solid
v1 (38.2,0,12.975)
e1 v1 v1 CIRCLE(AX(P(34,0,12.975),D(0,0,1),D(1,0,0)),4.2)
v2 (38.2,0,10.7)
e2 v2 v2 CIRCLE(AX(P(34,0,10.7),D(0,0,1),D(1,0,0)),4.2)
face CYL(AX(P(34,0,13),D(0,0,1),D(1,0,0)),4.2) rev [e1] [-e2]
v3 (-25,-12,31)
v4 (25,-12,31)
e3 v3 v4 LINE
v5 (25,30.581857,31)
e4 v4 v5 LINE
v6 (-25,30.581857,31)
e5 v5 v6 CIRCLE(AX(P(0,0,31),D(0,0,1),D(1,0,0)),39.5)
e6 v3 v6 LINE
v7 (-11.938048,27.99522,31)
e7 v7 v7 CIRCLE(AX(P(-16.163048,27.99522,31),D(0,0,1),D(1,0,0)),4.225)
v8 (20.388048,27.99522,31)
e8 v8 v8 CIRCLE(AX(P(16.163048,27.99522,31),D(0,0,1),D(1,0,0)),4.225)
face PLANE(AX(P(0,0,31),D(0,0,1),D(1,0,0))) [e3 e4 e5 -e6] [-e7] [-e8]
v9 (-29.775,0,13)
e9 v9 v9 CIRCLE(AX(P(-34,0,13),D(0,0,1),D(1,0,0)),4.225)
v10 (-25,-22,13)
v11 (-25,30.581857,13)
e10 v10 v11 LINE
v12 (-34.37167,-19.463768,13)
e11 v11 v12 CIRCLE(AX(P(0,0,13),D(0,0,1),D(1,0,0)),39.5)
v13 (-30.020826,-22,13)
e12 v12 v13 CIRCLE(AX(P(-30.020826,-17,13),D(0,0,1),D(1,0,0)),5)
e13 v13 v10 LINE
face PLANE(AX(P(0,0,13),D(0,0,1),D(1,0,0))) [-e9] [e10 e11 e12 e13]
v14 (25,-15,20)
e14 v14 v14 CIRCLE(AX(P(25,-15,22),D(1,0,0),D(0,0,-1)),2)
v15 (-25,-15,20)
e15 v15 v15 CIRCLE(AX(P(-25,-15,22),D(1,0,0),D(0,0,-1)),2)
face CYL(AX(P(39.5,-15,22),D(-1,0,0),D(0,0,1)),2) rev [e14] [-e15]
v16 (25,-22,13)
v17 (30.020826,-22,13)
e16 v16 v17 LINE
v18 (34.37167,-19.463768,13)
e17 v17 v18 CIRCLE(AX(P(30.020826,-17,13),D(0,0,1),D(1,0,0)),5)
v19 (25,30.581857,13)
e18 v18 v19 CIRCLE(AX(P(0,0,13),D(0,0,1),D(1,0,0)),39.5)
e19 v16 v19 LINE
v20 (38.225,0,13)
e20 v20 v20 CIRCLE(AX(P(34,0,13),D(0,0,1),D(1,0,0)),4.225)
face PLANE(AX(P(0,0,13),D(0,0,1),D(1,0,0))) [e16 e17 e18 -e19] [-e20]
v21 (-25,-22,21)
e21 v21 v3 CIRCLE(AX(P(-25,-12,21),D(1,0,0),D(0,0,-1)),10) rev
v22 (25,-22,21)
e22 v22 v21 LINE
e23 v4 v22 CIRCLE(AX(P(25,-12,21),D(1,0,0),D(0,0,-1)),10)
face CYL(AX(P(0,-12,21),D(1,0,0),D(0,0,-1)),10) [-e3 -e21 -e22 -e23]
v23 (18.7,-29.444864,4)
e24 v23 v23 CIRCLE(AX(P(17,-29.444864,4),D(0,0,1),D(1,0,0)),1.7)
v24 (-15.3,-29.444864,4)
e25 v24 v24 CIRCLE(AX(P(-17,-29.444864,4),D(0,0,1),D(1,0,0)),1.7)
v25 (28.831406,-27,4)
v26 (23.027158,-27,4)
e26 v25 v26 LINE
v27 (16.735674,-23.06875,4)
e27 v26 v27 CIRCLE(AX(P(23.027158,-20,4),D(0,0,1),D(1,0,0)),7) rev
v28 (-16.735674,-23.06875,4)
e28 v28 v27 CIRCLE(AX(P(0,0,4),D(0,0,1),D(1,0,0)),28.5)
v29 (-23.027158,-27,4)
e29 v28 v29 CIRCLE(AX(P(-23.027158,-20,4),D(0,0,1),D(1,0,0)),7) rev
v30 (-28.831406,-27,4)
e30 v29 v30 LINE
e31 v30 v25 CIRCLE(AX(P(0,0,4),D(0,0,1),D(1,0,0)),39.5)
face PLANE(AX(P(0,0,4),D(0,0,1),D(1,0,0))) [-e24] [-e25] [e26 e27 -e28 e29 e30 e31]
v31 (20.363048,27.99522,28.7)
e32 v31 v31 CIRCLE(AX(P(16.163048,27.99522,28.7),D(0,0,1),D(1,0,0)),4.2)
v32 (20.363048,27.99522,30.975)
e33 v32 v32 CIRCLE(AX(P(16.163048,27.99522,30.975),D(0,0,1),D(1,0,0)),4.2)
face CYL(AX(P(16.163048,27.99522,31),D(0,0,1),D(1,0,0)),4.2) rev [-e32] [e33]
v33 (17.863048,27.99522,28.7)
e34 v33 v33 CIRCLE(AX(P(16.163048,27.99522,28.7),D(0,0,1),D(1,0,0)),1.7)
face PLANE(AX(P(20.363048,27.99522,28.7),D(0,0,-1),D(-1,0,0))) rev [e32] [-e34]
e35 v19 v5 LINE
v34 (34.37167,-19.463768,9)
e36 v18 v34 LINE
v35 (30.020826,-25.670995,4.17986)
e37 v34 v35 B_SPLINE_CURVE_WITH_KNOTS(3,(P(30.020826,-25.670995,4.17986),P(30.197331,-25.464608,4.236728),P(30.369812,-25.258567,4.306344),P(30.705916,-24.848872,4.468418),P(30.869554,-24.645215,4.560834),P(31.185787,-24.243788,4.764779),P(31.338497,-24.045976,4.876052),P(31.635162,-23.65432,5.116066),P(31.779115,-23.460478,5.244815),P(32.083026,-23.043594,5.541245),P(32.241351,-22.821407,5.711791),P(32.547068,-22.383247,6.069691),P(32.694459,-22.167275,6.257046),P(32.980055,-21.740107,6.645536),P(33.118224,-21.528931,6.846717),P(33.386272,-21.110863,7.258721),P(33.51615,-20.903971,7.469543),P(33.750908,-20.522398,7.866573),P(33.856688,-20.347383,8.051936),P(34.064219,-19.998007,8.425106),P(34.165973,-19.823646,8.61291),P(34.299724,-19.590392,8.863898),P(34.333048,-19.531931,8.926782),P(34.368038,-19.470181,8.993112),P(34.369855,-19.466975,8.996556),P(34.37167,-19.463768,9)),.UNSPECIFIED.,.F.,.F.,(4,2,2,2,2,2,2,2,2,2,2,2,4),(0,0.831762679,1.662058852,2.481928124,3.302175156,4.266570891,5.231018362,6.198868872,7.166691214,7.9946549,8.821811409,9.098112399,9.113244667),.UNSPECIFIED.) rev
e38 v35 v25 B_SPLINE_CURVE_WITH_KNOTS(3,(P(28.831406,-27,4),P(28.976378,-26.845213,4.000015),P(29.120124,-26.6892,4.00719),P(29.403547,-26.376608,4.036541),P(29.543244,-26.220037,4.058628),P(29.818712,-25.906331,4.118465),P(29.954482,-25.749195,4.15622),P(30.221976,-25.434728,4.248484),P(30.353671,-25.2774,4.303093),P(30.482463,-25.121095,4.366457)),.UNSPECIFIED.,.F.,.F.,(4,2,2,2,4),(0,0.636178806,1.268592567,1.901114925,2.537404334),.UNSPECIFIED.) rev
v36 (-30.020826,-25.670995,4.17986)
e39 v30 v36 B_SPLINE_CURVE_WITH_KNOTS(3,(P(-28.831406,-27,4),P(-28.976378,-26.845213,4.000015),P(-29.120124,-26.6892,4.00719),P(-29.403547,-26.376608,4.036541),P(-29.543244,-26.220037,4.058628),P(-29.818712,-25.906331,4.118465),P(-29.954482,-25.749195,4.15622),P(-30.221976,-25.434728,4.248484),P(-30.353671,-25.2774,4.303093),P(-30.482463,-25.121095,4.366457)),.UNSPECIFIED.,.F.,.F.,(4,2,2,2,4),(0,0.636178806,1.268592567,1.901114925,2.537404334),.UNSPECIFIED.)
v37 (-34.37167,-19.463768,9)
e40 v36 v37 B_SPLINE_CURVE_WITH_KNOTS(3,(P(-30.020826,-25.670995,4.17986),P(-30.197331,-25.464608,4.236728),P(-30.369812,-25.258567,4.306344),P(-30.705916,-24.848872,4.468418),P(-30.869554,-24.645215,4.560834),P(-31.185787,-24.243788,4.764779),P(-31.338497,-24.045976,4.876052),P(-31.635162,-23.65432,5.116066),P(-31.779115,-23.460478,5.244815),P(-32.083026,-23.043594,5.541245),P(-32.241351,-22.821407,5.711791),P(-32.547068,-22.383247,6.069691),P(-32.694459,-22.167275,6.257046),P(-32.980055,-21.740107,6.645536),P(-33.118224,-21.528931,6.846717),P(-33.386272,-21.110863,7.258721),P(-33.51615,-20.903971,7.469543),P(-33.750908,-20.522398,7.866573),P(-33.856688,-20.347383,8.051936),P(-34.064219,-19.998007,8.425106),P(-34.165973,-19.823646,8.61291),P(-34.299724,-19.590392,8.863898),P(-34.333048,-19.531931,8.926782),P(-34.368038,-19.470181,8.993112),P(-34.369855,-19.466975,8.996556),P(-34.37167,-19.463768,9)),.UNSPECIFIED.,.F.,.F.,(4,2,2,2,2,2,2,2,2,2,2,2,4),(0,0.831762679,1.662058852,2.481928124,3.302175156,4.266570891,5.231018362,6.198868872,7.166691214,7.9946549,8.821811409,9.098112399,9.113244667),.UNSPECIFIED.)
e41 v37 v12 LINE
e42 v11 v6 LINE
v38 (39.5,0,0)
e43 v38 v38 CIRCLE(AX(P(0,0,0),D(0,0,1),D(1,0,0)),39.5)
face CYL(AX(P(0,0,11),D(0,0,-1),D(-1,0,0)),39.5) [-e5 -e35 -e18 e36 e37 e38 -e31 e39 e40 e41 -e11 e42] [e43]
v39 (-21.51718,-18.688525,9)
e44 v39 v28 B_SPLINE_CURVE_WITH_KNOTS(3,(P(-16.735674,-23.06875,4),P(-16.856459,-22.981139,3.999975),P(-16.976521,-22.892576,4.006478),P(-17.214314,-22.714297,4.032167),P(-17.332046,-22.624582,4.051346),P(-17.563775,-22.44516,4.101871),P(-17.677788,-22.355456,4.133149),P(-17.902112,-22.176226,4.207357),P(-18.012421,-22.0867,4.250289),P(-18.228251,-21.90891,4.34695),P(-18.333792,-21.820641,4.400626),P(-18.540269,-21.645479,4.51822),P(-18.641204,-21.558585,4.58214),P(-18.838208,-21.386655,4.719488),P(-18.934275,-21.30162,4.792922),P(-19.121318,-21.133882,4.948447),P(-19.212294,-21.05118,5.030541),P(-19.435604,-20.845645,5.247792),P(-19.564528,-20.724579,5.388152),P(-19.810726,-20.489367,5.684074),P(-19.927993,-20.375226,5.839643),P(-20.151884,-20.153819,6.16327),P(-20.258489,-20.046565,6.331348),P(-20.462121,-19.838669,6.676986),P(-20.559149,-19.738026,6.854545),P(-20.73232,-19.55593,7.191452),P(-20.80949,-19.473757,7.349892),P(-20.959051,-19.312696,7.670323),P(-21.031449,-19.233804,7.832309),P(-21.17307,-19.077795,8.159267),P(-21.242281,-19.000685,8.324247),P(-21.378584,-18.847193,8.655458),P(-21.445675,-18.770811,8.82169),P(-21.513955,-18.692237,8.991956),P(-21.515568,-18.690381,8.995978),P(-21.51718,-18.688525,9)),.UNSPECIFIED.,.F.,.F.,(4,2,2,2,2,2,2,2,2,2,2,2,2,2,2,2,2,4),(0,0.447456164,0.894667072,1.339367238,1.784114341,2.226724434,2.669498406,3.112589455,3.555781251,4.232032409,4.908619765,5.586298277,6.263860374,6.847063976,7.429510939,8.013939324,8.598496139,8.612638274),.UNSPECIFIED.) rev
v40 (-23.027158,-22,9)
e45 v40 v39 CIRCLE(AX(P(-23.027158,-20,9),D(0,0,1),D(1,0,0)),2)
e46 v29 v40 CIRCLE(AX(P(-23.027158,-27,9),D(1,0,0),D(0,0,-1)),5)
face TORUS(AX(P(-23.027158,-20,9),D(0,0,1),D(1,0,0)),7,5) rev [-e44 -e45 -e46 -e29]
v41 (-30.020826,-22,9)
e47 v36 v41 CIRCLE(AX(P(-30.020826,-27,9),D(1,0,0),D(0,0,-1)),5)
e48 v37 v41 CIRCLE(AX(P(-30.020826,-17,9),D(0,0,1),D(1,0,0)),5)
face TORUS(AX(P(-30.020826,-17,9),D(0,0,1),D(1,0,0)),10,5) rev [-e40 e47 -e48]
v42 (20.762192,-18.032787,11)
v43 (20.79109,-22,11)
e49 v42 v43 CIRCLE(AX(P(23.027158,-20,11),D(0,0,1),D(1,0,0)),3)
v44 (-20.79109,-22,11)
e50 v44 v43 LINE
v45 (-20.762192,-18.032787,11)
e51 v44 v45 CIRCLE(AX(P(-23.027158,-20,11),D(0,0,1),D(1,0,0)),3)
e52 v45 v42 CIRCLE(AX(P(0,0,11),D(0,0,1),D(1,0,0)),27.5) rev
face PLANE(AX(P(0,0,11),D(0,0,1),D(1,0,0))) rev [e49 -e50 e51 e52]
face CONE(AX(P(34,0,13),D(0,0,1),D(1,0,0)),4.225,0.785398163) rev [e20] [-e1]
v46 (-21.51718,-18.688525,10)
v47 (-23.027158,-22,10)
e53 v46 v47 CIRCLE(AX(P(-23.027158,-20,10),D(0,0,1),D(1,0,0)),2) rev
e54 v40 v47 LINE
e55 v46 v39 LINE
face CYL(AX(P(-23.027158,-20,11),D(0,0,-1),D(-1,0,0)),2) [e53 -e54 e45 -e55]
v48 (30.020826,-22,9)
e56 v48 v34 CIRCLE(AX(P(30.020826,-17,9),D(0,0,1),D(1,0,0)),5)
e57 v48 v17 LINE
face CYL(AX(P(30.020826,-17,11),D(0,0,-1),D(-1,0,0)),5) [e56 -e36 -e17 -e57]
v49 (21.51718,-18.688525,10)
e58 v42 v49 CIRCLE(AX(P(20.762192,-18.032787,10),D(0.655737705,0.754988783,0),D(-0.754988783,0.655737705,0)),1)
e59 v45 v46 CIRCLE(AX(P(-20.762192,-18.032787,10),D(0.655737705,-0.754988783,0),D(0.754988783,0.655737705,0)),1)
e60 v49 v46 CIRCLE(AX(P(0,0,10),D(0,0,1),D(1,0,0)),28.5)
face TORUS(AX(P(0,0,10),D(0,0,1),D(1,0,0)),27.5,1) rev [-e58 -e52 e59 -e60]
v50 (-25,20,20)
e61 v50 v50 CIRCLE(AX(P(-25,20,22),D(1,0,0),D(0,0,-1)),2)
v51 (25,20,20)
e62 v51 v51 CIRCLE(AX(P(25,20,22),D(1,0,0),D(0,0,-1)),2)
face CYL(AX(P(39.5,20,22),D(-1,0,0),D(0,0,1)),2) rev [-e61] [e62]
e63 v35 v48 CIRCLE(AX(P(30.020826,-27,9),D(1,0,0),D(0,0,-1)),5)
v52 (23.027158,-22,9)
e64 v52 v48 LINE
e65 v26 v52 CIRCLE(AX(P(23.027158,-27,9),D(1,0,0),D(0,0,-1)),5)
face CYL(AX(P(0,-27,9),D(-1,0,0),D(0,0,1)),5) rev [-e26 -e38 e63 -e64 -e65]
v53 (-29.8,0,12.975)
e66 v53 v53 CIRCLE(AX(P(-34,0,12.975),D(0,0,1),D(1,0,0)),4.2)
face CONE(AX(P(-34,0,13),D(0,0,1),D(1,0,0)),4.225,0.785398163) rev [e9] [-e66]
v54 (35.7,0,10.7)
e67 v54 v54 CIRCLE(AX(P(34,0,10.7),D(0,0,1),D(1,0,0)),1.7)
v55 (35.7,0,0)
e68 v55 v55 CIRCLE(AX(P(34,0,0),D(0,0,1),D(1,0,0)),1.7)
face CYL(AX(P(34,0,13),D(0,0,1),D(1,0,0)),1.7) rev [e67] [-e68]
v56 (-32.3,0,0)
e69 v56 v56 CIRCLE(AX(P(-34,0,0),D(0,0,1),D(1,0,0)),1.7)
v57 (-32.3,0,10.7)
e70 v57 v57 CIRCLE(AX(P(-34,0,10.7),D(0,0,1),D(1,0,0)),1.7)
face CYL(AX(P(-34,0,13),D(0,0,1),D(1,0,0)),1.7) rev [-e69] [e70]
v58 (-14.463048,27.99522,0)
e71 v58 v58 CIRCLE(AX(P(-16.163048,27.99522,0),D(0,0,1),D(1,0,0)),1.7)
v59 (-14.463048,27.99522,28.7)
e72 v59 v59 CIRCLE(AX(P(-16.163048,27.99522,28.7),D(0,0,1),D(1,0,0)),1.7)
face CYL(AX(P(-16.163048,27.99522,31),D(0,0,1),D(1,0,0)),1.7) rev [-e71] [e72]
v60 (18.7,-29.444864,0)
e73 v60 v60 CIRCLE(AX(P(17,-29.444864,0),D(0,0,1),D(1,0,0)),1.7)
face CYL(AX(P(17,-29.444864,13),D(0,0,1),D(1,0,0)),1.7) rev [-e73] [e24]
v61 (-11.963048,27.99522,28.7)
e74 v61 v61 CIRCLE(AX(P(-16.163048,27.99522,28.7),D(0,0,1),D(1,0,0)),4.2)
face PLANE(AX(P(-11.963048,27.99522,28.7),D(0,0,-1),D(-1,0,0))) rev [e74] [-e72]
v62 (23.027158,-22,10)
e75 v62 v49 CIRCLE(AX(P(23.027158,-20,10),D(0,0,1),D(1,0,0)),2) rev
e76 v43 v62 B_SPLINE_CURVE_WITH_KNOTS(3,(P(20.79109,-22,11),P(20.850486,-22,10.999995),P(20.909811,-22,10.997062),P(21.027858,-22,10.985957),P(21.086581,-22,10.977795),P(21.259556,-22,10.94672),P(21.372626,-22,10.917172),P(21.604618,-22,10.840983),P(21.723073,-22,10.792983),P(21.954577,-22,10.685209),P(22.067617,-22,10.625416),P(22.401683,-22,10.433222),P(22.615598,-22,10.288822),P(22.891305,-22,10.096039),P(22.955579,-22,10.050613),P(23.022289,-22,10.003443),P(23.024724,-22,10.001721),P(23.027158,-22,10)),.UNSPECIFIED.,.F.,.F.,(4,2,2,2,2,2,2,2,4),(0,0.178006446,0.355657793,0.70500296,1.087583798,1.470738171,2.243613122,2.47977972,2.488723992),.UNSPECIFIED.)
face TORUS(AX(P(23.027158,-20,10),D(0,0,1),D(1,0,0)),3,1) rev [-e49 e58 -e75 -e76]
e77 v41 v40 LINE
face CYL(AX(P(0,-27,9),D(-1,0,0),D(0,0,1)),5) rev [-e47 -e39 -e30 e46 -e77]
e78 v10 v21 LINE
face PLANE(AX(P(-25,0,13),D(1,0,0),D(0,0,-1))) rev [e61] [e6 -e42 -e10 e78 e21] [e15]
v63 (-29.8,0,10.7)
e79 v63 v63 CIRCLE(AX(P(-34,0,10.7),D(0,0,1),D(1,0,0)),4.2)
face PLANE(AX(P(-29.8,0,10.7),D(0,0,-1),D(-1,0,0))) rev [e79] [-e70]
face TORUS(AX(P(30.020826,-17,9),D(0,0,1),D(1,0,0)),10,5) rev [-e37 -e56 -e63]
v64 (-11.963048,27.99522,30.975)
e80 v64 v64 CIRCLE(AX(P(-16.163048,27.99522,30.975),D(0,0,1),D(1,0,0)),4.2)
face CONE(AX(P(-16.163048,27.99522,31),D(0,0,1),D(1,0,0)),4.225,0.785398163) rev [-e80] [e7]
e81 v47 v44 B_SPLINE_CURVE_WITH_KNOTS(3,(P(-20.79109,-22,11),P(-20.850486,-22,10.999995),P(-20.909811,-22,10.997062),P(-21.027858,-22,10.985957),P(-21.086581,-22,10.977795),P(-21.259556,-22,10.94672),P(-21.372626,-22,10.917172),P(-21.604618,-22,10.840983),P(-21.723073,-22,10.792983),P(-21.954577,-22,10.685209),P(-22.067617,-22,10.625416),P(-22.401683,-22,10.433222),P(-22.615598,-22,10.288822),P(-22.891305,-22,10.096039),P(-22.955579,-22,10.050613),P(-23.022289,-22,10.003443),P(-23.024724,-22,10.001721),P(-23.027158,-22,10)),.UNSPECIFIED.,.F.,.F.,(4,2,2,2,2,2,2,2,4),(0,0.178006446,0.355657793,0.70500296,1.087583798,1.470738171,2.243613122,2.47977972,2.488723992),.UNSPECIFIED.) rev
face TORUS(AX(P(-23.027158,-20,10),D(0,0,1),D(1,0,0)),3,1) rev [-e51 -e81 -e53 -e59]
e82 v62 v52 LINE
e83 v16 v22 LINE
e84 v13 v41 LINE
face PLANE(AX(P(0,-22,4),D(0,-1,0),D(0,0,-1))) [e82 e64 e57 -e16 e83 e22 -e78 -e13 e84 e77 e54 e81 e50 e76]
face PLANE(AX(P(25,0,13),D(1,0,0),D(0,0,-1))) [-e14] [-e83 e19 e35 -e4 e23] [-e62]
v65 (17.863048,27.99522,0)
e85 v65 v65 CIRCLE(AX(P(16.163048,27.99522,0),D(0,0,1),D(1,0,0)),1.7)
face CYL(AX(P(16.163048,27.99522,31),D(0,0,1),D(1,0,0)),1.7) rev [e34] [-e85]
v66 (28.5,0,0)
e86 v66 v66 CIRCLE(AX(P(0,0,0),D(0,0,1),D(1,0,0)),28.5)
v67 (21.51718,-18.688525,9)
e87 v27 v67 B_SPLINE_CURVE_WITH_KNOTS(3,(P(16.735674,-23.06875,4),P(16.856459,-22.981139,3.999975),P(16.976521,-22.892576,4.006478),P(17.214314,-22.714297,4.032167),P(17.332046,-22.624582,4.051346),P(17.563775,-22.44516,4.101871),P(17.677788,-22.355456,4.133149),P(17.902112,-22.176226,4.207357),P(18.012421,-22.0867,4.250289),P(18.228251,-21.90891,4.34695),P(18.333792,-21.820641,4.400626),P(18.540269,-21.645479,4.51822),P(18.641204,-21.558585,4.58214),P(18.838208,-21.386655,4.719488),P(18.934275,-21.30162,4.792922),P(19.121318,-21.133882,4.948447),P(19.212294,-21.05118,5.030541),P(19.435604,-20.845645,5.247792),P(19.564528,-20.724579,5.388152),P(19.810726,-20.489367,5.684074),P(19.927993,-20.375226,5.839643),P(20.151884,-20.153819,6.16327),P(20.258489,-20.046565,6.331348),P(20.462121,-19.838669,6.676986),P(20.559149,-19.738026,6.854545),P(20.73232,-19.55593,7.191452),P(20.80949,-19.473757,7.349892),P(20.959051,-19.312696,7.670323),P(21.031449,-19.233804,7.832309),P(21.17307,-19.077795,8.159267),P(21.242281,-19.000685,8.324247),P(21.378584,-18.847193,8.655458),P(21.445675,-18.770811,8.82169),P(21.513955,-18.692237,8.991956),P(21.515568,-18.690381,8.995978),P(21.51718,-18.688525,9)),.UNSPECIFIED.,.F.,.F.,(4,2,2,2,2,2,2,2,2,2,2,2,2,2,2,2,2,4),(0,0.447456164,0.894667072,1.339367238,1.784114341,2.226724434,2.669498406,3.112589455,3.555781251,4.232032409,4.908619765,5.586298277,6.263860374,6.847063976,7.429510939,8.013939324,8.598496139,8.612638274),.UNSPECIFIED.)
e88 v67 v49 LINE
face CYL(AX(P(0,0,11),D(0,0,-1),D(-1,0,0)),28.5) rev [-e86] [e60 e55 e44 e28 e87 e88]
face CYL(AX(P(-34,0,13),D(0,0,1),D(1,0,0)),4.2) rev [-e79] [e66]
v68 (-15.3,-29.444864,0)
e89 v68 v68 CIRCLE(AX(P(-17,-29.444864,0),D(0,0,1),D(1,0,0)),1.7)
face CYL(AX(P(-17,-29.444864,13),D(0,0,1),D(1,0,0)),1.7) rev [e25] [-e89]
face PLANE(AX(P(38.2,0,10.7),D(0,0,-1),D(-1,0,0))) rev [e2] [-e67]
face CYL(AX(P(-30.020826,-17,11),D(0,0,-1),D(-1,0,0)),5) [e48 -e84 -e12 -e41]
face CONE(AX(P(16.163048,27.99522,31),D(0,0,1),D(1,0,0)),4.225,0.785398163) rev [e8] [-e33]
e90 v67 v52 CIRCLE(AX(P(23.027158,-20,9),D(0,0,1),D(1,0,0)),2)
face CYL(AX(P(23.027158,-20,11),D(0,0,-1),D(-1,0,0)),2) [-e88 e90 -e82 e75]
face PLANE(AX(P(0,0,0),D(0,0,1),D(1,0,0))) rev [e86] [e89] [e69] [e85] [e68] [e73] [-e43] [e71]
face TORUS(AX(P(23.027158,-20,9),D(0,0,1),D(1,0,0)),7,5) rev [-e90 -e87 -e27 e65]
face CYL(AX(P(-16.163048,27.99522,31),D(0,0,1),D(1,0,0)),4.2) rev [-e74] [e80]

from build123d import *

# Parameters (mm, degrees)
SKETCH1_R                                     = 39.5
SKETCH1_R_2                                   = 28.5
BOSS_EXTRUDE1_DEPTH                           = 11
SKETCH2_R                                     = 39.5
BOSS_EXTRUDE2_DEPTH                           = 20
CUT_EXTRUDE3_START                            = -27
CUT_EXTRUDE3_DEPTH                            = 27
CUT_EXTRUDE4_START                            = -18
CUT_EXTRUDE4_DEPTH                            = 18
CBORE_FOR_M3_HEX_HEAD_MACHINE_SCREW1_AT_COUNT = 2
CBORE_FOR_M3_HEX_HEAD_MACHINE_SCREW1_AT_PITCH = 68
CBORE_FOR_M3_HEX_HEAD_MACHINE_SCREW1_2_COUNT  = 2
CBORE_FOR_M3_HEX_HEAD_MACHINE_SCREW1_2_PITCH  = 58.889727457
CBORE_FOR_M3_HEX_HEAD_MACHINE_SCREW1_3_COUNT  = 2
CBORE_FOR_M3_HEX_HEAD_MACHINE_SCREW1_3_PITCH  = 34
FILLET2_R                                     = 2
CBORE_FOR_M3_HEX_HEAD_MACHINE_SCREW2_AT_COUNT = 2
CBORE_FOR_M3_HEX_HEAD_MACHINE_SCREW2_AT_PITCH = 32.326095378
CUT_EXTRUDE5_DEPTH                            = 82.740442866
CUT_EXTRUDE5_DEPTH_BACK                       = 82.740442866
SKETCH10_R                                    = 2
FILLET5_R                                     = 5
FILLET4_R                                     = 5
FILLET6_R                                     = 1
FILLET7_R                                     = 10


with BuildPart() as part:
    # Sketch1 → Boss-Extrude1 (new body)
    with BuildSketch(Plane.XY):
        Circle(SKETCH1_R)
        Circle(SKETCH1_R_2, mode=Mode.SUBTRACT)
    extrude(amount=BOSS_EXTRUDE1_DEPTH)

    # Sketch2 → Boss-Extrude2 (add)
    with BuildSketch(Plane.XY.offset(11)):
        Circle(SKETCH2_R)
    extrude(amount=BOSS_EXTRUDE2_DEPTH)

    # Sketch3 → Cut-Extrude3 (cut)
    with BuildSketch(Plane.XY.offset(31).offset(CUT_EXTRUDE3_START)):
        with BuildLine():
            ThreePointArc((-32.806249405, -22), (0, -39.5), (32.806249405, -22))
            Line((32.806249405, -22), (-32.806249405, -22))
        make_face()
    extrude(amount=CUT_EXTRUDE3_DEPTH, mode=Mode.SUBTRACT)

    # Sketch4 → Cut-Extrude4 (cut)
    with BuildSketch(Plane.XY.offset(31).offset(CUT_EXTRUDE4_START)):
        with BuildLine():
            Line((-32.806249405, -22), (-25, -22))
            Line((-25, -22), (-25, 30.581857367))
            ThreePointArc((-25, 30.581857367), (-39.071774321, 5.800556129), (-32.806249405, -22))
        make_face()
        with BuildLine():
            Line((25, 30.581857367), (25, -22))
            Line((25, -22), (32.806249405, -22))
            ThreePointArc((32.806249405, -22), (39.071774321, 5.800556129), (25, 30.581857367))
        make_face()
    extrude(amount=CUT_EXTRUDE4_DEPTH, mode=Mode.SUBTRACT)

    # Sketch6 → CBORE for M3 Hex Head Machine Screw1 (revolve, cut)
    with BuildSketch(Plane(origin=(-34, 0, 13), x_dir=(0, -1, 0), z_dir=(1, 0, 0))):
        Polygon((0, 0), (0, 13), (1.7, 13), (1.7, 2.3), (4.2, 2.3), (4.2, 0.025), (4.225, 0), align=None)
    cbore_for_m3_hex_head_machine_screw1 = revolve(axis=Axis((-34, 0, 19.35), (0, 0, -1)), mode=Mode.SUBTRACT)

    # CBORE for M3 Hex Head Machine Screw1 at: CBORE for M3 Hex Head Machine Screw1 ×2
    with Locations(*[(i * CBORE_FOR_M3_HEX_HEAD_MACHINE_SCREW1_AT_PITCH, 0, 0) for i in range(1, CBORE_FOR_M3_HEX_HEAD_MACHINE_SCREW1_AT_COUNT)]):
        add(cbore_for_m3_hex_head_machine_screw1, mode=Mode.SUBTRACT)

    # CBORE for M3 Hex Head Machine Screw1 2: CBORE for M3 Hex Head Machine Screw1 ×2
    with Locations(*[Vector(0.8660254037844364, -0.500000000000004, 0) * (i * CBORE_FOR_M3_HEX_HEAD_MACHINE_SCREW1_2_PITCH) for i in range(1, CBORE_FOR_M3_HEX_HEAD_MACHINE_SCREW1_2_COUNT)]):
        add(cbore_for_m3_hex_head_machine_screw1, mode=Mode.SUBTRACT)

    # CBORE for M3 Hex Head Machine Screw1 3: CBORE for M3 Hex Head Machine Screw1 ×2
    with Locations(*[Vector(0.4999999999999949, -0.8660254037844417, 0) * (i * CBORE_FOR_M3_HEX_HEAD_MACHINE_SCREW1_3_PITCH) for i in range(1, CBORE_FOR_M3_HEX_HEAD_MACHINE_SCREW1_3_COUNT)]):
        add(cbore_for_m3_hex_head_machine_screw1, mode=Mode.SUBTRACT)

    # Fillet2
    fillet2_edges = [part.edges().sort_by_distance(p)[0] for p in [
        (-18.117670932, -22, 7.5),
        (18.117670932, -22, 7.5),
    ]]
    fillet(fillet2_edges, radius=FILLET2_R)

    # Sketch8 → CBORE for M3 Hex Head Machine Screw2 (revolve, cut)
    with BuildSketch(Plane(origin=(-16.163047689, 27.995219802, 31), x_dir=(0, -1, 0), z_dir=(1, 0, 0))):
        Polygon((0, 0), (0, 31), (1.7, 31), (1.7, 2.3), (4.2, 2.3), (4.2, 0.025), (4.225, 0), align=None)
    cbore_for_m3_hex_head_machine_screw2 = revolve(axis=Axis((-16.163047689, 27.995219802, 37.35), (0, 0, -1)), mode=Mode.SUBTRACT)

    # CBORE for M3 Hex Head Machine Screw2 at: CBORE for M3 Hex Head Machine Screw2 ×2
    with Locations(*[(i * CBORE_FOR_M3_HEX_HEAD_MACHINE_SCREW2_AT_PITCH, 0, 0) for i in range(1, CBORE_FOR_M3_HEX_HEAD_MACHINE_SCREW2_AT_COUNT)]):
        add(cbore_for_m3_hex_head_machine_screw2, mode=Mode.SUBTRACT)

    # Sketch10 → Cut-Extrude5 (cut, two sides: drawn at the far end of the back side and taken through both)
    with BuildSketch(Plane.ZY.offset(25).offset(-CUT_EXTRUDE5_DEPTH_BACK)):
        with Locations(Location((22, 20, 0), (0, 0, 180))):
            Circle(SKETCH10_R)
        with Locations(Location((22, -15, 0), (0, 0, 180))):
            Circle(SKETCH10_R)
    extrude(amount=CUT_EXTRUDE5_DEPTH + CUT_EXTRUDE5_DEPTH_BACK, mode=Mode.SUBTRACT)

    # Fillet5
    fillet5_edges = [part.edges().sort_by_distance(p)[0] for p in [
        (32.806249405, -22, 8.5),
        (-32.806249405, -22, 8.5),
    ]]
    fillet(fillet5_edges, radius=FILLET5_R)

    # Fillet4
    # the kernel refuses this fillet: 5 mm, written as the material it adds along each edge
    with BuildSketch(Plane(origin=(-23.027157879, -22, 4), x_dir=(0, 0, 1), z_dir=(-1, 0, 0))) as fillet4_piece_1_section:
        with BuildLine():
            CenterArc((FILLET4_R, -FILLET4_R), FILLET4_R, 90, 90)
            Line((0, -FILLET4_R), (0, 0))
            Line((0, 0), (FILLET4_R, 0))
        make_face()
    fillet4_piece_1 = extrude(amount=6.993668225, mode=Mode.PRIVATE)
    fillet4_piece_1 = fillet4_piece_1 & Plane(origin=(0, 0, 5.117497097), x_dir=(1, 0, 0), z_dir=(0, 0, -1)) * Cylinder(39.5, 34, mode=Mode.PRIVATE)
    add(fillet4_piece_1)
    with BuildSketch(Plane(origin=(30.020826105, -17, 4), x_dir=(0, -1, 0), z_dir=(-1, 0, 0))) as fillet4_piece_2_section:
        with BuildLine():
            CenterArc((5 + FILLET4_R, FILLET4_R), FILLET4_R, 180, 90)
            Line((5 + FILLET4_R, 0), (5, 0))
            Line((5, 0), (5, FILLET4_R))
        make_face()
    fillet4_piece_2 = revolve(axis=Axis((30.020826105, -17, 4), (0, 0, 1)), revolution_arc=203.743697153, mode=Mode.PRIVATE)
    fillet4_piece_2 = fillet4_piece_2 - Plane(origin=(0, 0, 5.881838576), x_dir=(1, 0, 0), z_dir=(0, 0, -1)) * Cylinder(28.5, 40, mode=Mode.PRIVATE)
    fillet4_piece_2 = fillet4_piece_2 & Plane(origin=(0, 0, 5.881838576), x_dir=(1, 0, 0), z_dir=(0, 0, -1)) * Cylinder(39.5, 40, mode=Mode.PRIVATE)
    add(fillet4_piece_2)
    with BuildSketch(Plane(origin=(-30.020826105, -17, 4), x_dir=(0, -1, 0), z_dir=(1, 0, 0))) as fillet4_piece_3_section:
        with BuildLine():
            CenterArc((5 + FILLET4_R, -FILLET4_R), FILLET4_R, 90, 90)
            Line((5 + FILLET4_R, 0), (5, 0))
            Line((5, 0), (5, -FILLET4_R))
        make_face()
    fillet4_piece_3 = revolve(axis=Axis((-30.020826105, -17, 4), (0, 0, -1)), revolution_arc=203.743697153, mode=Mode.PRIVATE)
    fillet4_piece_3 = fillet4_piece_3 - Plane(origin=(0, 0, 5.881838618), x_dir=(1, 0, 0), z_dir=(0, 0, -1)) * Cylinder(28.5, 40, mode=Mode.PRIVATE)
    fillet4_piece_3 = fillet4_piece_3 & Plane(origin=(0, 0, 5.881838618), x_dir=(1, 0, 0), z_dir=(0, 0, -1)) * Cylinder(39.5, 40, mode=Mode.PRIVATE)
    add(fillet4_piece_3)
    with BuildSketch(Plane(origin=(30.020826105, -22, 4), x_dir=(0, 0, 1), z_dir=(-1, 0, 0))) as fillet4_piece_4_section:
        with BuildLine():
            CenterArc((FILLET4_R, -FILLET4_R), FILLET4_R, 90, 90)
            Line((0, -FILLET4_R), (0, 0))
            Line((0, 0), (FILLET4_R, 0))
        make_face()
    fillet4_piece_4 = extrude(amount=6.993668225, mode=Mode.PRIVATE)
    fillet4_piece_4 = fillet4_piece_4 & Plane(origin=(0, 0, 5.117497097), x_dir=(1, 0, 0), z_dir=(0, 0, -1)) * Cylinder(39.5, 34, mode=Mode.PRIVATE)
    add(fillet4_piece_4)
    with BuildSketch(Plane(origin=(-23.027157879, -20, 4), x_dir=(0, -1, 0), z_dir=(-1, 0, 0))) as fillet4_piece_5_section:
        with BuildLine():
            CenterArc((2 + FILLET4_R, FILLET4_R), FILLET4_R, 180, 90)
            Line((2 + FILLET4_R, 0), (2, 0))
            Line((2, 0), (2, FILLET4_R))
        make_face()
    fillet4_piece_5 = revolve(axis=Axis((-23.027157879, -20, 4), (0, 0, 1)), revolution_arc=359.64, mode=Mode.PRIVATE)
    fillet4_piece_5 = fillet4_piece_5 - Plane(origin=(0, 0, 5.416079677), x_dir=(1, 0, 0), z_dir=(0, 0, -1)) * Cylinder(28.5, 28, mode=Mode.PRIVATE)
    add(fillet4_piece_5)
    with BuildSketch(Plane(origin=(23.027157879, -20, 4), x_dir=(0, -1, 0), z_dir=(1, 0, 0))) as fillet4_piece_6_section:
        with BuildLine():
            CenterArc((2 + FILLET4_R, -FILLET4_R), FILLET4_R, 90, 90)
            Line((2 + FILLET4_R, 0), (2, 0))
            Line((2, 0), (2, -FILLET4_R))
        make_face()
    fillet4_piece_6 = revolve(axis=Axis((23.027157879, -20, 4), (0, 0, -1)), revolution_arc=359.64, mode=Mode.PRIVATE)
    fillet4_piece_6 = fillet4_piece_6 - Plane(origin=(0, 0, 5.416079623), x_dir=(1, 0, 0), z_dir=(0, 0, -1)) * Cylinder(28.5, 28, mode=Mode.PRIVATE)
    add(fillet4_piece_6)

    # Fillet6
    # the kernel refuses this fillet: 1 mm, written as the material it adds along each edge
    with BuildSketch(Plane(origin=(0, 0, 11), x_dir=(1, 0, 0), z_dir=(0, -1, 0))) as fillet6_piece_1:
        with BuildLine():
            CenterArc((28.5 - FILLET6_R, -FILLET6_R), FILLET6_R, 0, 90)
            Line((28.5 - FILLET6_R, 0), (28.5, 0))
            Line((28.5, 0), (28.5, -FILLET6_R))
        make_face()
    revolve(axis=Axis((0, 0, 11), (0, 0, 1)), revolution_arc=220.975610343)
    with BuildSketch(Plane(origin=(-23.027157879, -20, 11), x_dir=(-0.9493195168959316, -0.31431267050578, 0), z_dir=(-0.31431267050578, 0.9493195168959316, 0))) as fillet6_piece_2_section:
        with BuildLine():
            CenterArc((2 + FILLET6_R, -FILLET6_R), FILLET6_R, 90, 90)
            Line((2, -FILLET6_R), (2, 0))
            Line((2, 0), (2 + FILLET6_R, 0))
        make_face()
    fillet6_piece_2 = revolve(axis=Axis((-23.027157879, -20, 11), (0, 0, 1)), revolution_arc=202.656285008, mode=Mode.PRIVATE)
    fillet6_piece_2 = split(fillet6_piece_2, bisect_by=Plane(origin=(-21.199330991, -22, 10.4999997), z_dir=(0, 1, 0)), keep=Keep.TOP, mode=Mode.PRIVATE)
    add(fillet6_piece_2)
    with BuildSketch(Plane(origin=(23.027157879, -20, 11), x_dir=(0.9493195168959316, -0.31431267050578, 0), z_dir=(0.31431267050578, 0.9493195168959316, 0))) as fillet6_piece_3_section:
        with BuildLine():
            CenterArc((2 + FILLET6_R, FILLET6_R), FILLET6_R, 180, 90)
            Line((2 + FILLET6_R, 0), (2, 0))
            Line((2, 0), (2, FILLET6_R))
        make_face()
    fillet6_piece_3 = revolve(axis=Axis((23.027157879, -20, 11), (0, 0, -1)), revolution_arc=202.656285008, mode=Mode.PRIVATE)
    fillet6_piece_3 = split(fillet6_piece_3, bisect_by=Plane(origin=(20.946630344, -22, 10.713386851), z_dir=(0, 1, 0)), keep=Keep.TOP, mode=Mode.PRIVATE)
    add(fillet6_piece_3)
    with BuildSketch(Plane(origin=(0, 0, 11), x_dir=(0.7549887829291444, -0.6557377049180327, 0), z_dir=(-0.6557377049180327, -0.7549887829291444, 0))) as fillet6_piece_4:
        with BuildLine():
            CenterArc((28.5 - FILLET6_R, -FILLET6_R), FILLET6_R, 0, 90)
            Line((28.5 - FILLET6_R, 0), (28.5, 0))
            Line((28.5, 0), (28.5, -FILLET6_R))
        make_face()
    revolve(axis=Axis((0, 0, 11), (0, 0, 1)), revolution_arc=40.975610343)

    # Fillet7
    fillet7_edges = [part.edges().sort_by_distance(p)[0] for p in [
        (0, -22, 31),
    ]]
    fillet(fillet7_edges, radius=FILLET7_R)


solid = part.part
